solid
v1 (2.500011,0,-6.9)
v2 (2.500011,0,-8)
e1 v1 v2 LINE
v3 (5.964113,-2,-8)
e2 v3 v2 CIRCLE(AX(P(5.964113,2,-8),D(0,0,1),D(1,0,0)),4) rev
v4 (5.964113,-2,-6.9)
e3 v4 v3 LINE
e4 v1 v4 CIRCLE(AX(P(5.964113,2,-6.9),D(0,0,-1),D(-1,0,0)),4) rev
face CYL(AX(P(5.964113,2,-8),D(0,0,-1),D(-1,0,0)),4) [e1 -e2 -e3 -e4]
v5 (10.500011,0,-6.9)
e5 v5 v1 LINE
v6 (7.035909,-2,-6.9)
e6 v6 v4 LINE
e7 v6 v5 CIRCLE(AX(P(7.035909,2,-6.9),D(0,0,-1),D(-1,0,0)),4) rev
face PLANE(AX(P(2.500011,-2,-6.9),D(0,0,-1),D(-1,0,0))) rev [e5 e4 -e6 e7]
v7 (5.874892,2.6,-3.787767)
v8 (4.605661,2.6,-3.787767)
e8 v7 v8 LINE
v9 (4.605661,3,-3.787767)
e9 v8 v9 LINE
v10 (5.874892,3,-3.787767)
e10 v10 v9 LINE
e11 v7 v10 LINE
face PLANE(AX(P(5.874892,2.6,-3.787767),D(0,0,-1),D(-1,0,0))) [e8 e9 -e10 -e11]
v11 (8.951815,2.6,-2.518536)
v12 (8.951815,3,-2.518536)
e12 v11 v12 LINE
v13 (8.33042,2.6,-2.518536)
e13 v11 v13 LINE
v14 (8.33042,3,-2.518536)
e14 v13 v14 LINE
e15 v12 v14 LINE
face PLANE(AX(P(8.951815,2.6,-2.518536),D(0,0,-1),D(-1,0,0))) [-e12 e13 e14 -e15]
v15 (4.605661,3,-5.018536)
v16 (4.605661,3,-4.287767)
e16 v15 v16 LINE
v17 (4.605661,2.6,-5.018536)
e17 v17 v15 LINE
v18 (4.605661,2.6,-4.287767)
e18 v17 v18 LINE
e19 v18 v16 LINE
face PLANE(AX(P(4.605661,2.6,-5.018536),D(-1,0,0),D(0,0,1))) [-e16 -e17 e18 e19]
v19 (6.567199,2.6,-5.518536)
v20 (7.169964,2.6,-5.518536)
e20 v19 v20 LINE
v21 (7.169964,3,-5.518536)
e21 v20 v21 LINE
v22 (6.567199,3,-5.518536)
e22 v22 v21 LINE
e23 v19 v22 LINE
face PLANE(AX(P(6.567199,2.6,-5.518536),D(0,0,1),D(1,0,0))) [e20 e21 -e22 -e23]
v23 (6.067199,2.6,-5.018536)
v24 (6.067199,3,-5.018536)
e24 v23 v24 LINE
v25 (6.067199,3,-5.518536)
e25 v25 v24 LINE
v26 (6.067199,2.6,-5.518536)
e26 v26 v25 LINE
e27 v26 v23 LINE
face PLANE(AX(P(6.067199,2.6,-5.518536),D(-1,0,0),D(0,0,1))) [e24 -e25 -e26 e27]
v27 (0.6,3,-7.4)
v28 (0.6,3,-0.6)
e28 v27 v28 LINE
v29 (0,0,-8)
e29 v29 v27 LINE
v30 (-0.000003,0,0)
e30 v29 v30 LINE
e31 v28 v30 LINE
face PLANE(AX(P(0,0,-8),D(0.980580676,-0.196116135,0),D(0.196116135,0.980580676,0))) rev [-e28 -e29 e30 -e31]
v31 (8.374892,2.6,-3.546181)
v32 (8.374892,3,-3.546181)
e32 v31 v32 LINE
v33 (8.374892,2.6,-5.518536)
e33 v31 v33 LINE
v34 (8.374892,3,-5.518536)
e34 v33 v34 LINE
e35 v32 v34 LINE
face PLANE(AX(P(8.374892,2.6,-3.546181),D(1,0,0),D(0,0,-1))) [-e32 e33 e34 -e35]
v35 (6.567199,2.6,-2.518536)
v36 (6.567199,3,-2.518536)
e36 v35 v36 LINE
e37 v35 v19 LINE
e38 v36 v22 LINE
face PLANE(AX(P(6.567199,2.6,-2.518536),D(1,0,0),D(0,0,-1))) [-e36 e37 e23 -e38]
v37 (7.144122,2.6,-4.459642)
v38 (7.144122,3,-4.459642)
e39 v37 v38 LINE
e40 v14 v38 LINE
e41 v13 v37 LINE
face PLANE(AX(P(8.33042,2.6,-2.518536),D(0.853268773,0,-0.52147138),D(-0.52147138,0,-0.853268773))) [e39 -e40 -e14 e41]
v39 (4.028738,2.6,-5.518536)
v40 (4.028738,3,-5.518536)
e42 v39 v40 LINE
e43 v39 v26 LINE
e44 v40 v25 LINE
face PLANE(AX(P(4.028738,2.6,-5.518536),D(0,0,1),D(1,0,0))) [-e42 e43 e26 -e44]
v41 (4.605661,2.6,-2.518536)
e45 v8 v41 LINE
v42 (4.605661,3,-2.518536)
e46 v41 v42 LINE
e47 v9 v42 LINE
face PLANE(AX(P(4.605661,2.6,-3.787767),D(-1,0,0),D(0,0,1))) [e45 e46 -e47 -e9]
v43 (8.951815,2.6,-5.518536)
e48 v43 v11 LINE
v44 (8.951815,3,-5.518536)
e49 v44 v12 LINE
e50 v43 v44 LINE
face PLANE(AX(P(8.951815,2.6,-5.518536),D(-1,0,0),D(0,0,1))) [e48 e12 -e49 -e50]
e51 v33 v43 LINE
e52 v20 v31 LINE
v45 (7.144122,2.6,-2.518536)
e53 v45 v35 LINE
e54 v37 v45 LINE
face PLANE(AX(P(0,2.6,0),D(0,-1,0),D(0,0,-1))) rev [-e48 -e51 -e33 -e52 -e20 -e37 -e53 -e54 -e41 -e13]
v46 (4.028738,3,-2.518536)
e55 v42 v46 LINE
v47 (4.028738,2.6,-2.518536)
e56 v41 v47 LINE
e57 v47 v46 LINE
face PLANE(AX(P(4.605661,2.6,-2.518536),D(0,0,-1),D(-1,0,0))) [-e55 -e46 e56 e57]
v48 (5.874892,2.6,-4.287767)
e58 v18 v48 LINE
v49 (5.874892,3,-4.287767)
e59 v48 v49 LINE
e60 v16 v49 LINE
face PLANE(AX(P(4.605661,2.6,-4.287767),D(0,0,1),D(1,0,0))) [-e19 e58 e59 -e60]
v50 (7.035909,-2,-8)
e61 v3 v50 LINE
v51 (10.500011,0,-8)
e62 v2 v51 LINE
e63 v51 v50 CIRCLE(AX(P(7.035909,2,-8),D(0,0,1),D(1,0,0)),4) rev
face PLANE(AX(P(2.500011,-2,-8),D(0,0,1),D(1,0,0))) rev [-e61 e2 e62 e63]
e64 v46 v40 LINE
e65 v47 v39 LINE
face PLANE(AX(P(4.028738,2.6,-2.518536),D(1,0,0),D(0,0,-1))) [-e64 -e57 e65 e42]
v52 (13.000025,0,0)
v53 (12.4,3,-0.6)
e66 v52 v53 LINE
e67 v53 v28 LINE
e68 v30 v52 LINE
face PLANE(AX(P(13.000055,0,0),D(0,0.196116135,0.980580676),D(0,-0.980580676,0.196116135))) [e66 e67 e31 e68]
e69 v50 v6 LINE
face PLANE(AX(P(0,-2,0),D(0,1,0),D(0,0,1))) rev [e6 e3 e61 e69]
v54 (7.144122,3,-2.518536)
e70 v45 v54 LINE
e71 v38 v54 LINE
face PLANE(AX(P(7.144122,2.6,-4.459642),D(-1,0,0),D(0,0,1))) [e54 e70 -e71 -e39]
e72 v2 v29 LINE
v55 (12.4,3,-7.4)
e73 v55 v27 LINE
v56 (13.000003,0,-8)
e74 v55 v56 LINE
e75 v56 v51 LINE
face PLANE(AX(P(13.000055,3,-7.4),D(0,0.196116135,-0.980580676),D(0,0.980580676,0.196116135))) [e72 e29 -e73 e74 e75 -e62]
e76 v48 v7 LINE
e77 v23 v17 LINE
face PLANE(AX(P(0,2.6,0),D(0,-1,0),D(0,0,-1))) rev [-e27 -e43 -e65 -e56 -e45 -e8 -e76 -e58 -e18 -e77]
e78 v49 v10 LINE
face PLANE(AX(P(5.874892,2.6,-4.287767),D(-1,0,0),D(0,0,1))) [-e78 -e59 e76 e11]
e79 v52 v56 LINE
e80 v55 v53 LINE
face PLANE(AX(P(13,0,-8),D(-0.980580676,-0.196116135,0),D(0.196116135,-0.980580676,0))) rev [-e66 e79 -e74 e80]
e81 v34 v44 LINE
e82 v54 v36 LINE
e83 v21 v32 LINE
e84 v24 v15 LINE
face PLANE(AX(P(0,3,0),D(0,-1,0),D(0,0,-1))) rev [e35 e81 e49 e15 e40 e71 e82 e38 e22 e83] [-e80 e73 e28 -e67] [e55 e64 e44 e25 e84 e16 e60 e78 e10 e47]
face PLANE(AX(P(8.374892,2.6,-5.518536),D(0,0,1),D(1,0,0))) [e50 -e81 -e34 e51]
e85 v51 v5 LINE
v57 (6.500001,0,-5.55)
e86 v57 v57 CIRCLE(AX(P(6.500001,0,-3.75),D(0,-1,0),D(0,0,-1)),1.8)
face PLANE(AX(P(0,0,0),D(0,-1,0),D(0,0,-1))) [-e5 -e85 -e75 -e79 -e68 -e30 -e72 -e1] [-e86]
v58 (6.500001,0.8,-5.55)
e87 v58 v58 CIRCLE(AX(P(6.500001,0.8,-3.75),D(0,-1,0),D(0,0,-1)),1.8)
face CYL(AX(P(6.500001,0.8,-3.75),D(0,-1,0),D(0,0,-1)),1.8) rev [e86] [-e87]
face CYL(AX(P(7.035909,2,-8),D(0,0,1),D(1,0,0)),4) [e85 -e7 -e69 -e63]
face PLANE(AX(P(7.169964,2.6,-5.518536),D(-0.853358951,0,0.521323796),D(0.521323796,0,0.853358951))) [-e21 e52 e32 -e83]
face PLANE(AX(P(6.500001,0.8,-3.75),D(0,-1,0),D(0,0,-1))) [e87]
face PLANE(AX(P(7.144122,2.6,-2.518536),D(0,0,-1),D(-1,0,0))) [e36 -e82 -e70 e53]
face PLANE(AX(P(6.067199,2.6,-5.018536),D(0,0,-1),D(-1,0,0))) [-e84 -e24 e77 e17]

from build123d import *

# Parameters (mm, degrees)
SKETCH1_W               = 13
SKETCH1_H               = 8
BOSS_EXTRUDE1_DEPTH     = 3
CUT_EXTRUDE1_DEPTH      = 16.556349186
CUT_EXTRUDE1_DEPTH_BACK = 16.556349186
CUT_EXTRUDE2_DEPTH      = 16.556349186
CUT_EXTRUDE2_DEPTH_BACK = 16.556349186
SKETCH4_R               = 1.8
CUT_EXTRUDE3_DEPTH      = 0.8
SKETCH5_W               = 8
SKETCH5_H               = 1.1
BOSS_EXTRUDE2_DEPTH     = 2
FILLET1_R               = 4
CUT_EXTRUDE4_DEPTH      = 0.4


with BuildPart() as part:
    # Sketch1 → Boss-Extrude1 (new body)
    with BuildSketch(Plane(origin=(0, 0, 0), x_dir=(1, 0, 0), z_dir=(0, 1, 0))):
        with Locations((6.5, 4)):
            Rectangle(SKETCH1_W, SKETCH1_H)
    extrude(amount=BOSS_EXTRUDE1_DEPTH)

    # Sketch2 → Cut-Extrude1 (cut, two sides: drawn at the far end of the back side and taken through both)
    with BuildSketch(Plane.XY.offset(-CUT_EXTRUDE1_DEPTH_BACK)):
        Polygon((0, 0), (0.6, 3), (0, 3), align=None)
        Polygon((13, 0), (12.4, 3), (13, 3), align=None)
    extrude(amount=CUT_EXTRUDE1_DEPTH + CUT_EXTRUDE1_DEPTH_BACK, mode=Mode.SUBTRACT)

    # Sketch3 → Cut-Extrude2 (cut, two sides: drawn at the far end of the back side and taken through both)
    with BuildSketch(Plane(origin=(0, 0, 0), x_dir=(0, 0, -1), z_dir=(1, 0, 0)).offset(-CUT_EXTRUDE2_DEPTH_BACK)):
        Polygon((0, 0), (0.6, 3), (0, 3), align=None)
        Polygon((8, 3), (7.4, 3), (8, 0), align=None)
    extrude(amount=CUT_EXTRUDE2_DEPTH + CUT_EXTRUDE2_DEPTH_BACK, mode=Mode.SUBTRACT)

    # Sketch4 → Cut-Extrude3 (cut)
    with BuildSketch(Plane.XZ):
        with Locations(Location((6.50000125, -3.75, 0), (0, 0, 270))):
            Circle(SKETCH4_R)
    extrude(amount=-CUT_EXTRUDE3_DEPTH, mode=Mode.SUBTRACT)

    # Sketch5 → Boss-Extrude2 (add)
    with BuildSketch(Plane.XZ):
        with Locations((6.500011, -7.45)):
            Rectangle(SKETCH5_W, SKETCH5_H)
    extrude(amount=BOSS_EXTRUDE2_DEPTH)

    # Fillet1
    # the kernel refuses this fillet: 4 mm, written as the material it takes off along each edge
    with BuildSketch(Plane(origin=(10.500011, -2, -16.660254038), x_dir=(0, 1, 0), z_dir=(0, 0, 1)), Plane(origin=(2.500011, -2, 1.760254038), x_dir=(0, 1, 0), z_dir=(0, 0, -1))) as fillet1_piece_1:
        with BuildLine():
            CenterArc((4, 3.464101615), FILLET1_R, 180, 60)
            Line((0, 3.464101615), (-0.08, 3.464101615))
            Line((-0.08, 3.464101615), (-0.08, 0))
            Line((-0.08, 0), (0, -0.08))
            ThreePointArc((0, -0.08), (1, -0.08), (1.96, -0.069282032))
            Line((1.96, -0.069282032), (2, 0))
        make_face()
    extrude(amount=18.420508076, mode=Mode.SUBTRACT)

    # Sketch6 → Cut-Extrude4 (cut)
    with BuildSketch(Plane(origin=(0, 3, 0), x_dir=(1, 0, 0), z_dir=(0, 1, 0))):
        Polygon((4.028737707, 2.518536397), (4.028737707, 5.518536397), (6.067199245, 5.518536397), (6.067199245, 5.018536397), (4.605660784, 5.018536397), (4.605660784, 4.287767167), (5.874891553, 4.287767167), (5.874891553, 3.787767167), (4.605660784, 3.787767167), (4.605660784, 2.518536397), align=None)
        Polygon((6.567199245, 2.518536397), (6.567199245, 5.518536397), (7.169963668, 5.518536397), (8.374891553, 3.546180628), (8.374891553, 5.518536397), (8.95181463, 5.518536397), (8.95181463, 2.518536397), (8.330420399, 2.518536397), (7.144122322, 4.459642167), (7.144122322, 2.518536397), align=None)
    extrude(amount=-CUT_EXTRUDE4_DEPTH, mode=Mode.SUBTRACT)


solid = part.part
